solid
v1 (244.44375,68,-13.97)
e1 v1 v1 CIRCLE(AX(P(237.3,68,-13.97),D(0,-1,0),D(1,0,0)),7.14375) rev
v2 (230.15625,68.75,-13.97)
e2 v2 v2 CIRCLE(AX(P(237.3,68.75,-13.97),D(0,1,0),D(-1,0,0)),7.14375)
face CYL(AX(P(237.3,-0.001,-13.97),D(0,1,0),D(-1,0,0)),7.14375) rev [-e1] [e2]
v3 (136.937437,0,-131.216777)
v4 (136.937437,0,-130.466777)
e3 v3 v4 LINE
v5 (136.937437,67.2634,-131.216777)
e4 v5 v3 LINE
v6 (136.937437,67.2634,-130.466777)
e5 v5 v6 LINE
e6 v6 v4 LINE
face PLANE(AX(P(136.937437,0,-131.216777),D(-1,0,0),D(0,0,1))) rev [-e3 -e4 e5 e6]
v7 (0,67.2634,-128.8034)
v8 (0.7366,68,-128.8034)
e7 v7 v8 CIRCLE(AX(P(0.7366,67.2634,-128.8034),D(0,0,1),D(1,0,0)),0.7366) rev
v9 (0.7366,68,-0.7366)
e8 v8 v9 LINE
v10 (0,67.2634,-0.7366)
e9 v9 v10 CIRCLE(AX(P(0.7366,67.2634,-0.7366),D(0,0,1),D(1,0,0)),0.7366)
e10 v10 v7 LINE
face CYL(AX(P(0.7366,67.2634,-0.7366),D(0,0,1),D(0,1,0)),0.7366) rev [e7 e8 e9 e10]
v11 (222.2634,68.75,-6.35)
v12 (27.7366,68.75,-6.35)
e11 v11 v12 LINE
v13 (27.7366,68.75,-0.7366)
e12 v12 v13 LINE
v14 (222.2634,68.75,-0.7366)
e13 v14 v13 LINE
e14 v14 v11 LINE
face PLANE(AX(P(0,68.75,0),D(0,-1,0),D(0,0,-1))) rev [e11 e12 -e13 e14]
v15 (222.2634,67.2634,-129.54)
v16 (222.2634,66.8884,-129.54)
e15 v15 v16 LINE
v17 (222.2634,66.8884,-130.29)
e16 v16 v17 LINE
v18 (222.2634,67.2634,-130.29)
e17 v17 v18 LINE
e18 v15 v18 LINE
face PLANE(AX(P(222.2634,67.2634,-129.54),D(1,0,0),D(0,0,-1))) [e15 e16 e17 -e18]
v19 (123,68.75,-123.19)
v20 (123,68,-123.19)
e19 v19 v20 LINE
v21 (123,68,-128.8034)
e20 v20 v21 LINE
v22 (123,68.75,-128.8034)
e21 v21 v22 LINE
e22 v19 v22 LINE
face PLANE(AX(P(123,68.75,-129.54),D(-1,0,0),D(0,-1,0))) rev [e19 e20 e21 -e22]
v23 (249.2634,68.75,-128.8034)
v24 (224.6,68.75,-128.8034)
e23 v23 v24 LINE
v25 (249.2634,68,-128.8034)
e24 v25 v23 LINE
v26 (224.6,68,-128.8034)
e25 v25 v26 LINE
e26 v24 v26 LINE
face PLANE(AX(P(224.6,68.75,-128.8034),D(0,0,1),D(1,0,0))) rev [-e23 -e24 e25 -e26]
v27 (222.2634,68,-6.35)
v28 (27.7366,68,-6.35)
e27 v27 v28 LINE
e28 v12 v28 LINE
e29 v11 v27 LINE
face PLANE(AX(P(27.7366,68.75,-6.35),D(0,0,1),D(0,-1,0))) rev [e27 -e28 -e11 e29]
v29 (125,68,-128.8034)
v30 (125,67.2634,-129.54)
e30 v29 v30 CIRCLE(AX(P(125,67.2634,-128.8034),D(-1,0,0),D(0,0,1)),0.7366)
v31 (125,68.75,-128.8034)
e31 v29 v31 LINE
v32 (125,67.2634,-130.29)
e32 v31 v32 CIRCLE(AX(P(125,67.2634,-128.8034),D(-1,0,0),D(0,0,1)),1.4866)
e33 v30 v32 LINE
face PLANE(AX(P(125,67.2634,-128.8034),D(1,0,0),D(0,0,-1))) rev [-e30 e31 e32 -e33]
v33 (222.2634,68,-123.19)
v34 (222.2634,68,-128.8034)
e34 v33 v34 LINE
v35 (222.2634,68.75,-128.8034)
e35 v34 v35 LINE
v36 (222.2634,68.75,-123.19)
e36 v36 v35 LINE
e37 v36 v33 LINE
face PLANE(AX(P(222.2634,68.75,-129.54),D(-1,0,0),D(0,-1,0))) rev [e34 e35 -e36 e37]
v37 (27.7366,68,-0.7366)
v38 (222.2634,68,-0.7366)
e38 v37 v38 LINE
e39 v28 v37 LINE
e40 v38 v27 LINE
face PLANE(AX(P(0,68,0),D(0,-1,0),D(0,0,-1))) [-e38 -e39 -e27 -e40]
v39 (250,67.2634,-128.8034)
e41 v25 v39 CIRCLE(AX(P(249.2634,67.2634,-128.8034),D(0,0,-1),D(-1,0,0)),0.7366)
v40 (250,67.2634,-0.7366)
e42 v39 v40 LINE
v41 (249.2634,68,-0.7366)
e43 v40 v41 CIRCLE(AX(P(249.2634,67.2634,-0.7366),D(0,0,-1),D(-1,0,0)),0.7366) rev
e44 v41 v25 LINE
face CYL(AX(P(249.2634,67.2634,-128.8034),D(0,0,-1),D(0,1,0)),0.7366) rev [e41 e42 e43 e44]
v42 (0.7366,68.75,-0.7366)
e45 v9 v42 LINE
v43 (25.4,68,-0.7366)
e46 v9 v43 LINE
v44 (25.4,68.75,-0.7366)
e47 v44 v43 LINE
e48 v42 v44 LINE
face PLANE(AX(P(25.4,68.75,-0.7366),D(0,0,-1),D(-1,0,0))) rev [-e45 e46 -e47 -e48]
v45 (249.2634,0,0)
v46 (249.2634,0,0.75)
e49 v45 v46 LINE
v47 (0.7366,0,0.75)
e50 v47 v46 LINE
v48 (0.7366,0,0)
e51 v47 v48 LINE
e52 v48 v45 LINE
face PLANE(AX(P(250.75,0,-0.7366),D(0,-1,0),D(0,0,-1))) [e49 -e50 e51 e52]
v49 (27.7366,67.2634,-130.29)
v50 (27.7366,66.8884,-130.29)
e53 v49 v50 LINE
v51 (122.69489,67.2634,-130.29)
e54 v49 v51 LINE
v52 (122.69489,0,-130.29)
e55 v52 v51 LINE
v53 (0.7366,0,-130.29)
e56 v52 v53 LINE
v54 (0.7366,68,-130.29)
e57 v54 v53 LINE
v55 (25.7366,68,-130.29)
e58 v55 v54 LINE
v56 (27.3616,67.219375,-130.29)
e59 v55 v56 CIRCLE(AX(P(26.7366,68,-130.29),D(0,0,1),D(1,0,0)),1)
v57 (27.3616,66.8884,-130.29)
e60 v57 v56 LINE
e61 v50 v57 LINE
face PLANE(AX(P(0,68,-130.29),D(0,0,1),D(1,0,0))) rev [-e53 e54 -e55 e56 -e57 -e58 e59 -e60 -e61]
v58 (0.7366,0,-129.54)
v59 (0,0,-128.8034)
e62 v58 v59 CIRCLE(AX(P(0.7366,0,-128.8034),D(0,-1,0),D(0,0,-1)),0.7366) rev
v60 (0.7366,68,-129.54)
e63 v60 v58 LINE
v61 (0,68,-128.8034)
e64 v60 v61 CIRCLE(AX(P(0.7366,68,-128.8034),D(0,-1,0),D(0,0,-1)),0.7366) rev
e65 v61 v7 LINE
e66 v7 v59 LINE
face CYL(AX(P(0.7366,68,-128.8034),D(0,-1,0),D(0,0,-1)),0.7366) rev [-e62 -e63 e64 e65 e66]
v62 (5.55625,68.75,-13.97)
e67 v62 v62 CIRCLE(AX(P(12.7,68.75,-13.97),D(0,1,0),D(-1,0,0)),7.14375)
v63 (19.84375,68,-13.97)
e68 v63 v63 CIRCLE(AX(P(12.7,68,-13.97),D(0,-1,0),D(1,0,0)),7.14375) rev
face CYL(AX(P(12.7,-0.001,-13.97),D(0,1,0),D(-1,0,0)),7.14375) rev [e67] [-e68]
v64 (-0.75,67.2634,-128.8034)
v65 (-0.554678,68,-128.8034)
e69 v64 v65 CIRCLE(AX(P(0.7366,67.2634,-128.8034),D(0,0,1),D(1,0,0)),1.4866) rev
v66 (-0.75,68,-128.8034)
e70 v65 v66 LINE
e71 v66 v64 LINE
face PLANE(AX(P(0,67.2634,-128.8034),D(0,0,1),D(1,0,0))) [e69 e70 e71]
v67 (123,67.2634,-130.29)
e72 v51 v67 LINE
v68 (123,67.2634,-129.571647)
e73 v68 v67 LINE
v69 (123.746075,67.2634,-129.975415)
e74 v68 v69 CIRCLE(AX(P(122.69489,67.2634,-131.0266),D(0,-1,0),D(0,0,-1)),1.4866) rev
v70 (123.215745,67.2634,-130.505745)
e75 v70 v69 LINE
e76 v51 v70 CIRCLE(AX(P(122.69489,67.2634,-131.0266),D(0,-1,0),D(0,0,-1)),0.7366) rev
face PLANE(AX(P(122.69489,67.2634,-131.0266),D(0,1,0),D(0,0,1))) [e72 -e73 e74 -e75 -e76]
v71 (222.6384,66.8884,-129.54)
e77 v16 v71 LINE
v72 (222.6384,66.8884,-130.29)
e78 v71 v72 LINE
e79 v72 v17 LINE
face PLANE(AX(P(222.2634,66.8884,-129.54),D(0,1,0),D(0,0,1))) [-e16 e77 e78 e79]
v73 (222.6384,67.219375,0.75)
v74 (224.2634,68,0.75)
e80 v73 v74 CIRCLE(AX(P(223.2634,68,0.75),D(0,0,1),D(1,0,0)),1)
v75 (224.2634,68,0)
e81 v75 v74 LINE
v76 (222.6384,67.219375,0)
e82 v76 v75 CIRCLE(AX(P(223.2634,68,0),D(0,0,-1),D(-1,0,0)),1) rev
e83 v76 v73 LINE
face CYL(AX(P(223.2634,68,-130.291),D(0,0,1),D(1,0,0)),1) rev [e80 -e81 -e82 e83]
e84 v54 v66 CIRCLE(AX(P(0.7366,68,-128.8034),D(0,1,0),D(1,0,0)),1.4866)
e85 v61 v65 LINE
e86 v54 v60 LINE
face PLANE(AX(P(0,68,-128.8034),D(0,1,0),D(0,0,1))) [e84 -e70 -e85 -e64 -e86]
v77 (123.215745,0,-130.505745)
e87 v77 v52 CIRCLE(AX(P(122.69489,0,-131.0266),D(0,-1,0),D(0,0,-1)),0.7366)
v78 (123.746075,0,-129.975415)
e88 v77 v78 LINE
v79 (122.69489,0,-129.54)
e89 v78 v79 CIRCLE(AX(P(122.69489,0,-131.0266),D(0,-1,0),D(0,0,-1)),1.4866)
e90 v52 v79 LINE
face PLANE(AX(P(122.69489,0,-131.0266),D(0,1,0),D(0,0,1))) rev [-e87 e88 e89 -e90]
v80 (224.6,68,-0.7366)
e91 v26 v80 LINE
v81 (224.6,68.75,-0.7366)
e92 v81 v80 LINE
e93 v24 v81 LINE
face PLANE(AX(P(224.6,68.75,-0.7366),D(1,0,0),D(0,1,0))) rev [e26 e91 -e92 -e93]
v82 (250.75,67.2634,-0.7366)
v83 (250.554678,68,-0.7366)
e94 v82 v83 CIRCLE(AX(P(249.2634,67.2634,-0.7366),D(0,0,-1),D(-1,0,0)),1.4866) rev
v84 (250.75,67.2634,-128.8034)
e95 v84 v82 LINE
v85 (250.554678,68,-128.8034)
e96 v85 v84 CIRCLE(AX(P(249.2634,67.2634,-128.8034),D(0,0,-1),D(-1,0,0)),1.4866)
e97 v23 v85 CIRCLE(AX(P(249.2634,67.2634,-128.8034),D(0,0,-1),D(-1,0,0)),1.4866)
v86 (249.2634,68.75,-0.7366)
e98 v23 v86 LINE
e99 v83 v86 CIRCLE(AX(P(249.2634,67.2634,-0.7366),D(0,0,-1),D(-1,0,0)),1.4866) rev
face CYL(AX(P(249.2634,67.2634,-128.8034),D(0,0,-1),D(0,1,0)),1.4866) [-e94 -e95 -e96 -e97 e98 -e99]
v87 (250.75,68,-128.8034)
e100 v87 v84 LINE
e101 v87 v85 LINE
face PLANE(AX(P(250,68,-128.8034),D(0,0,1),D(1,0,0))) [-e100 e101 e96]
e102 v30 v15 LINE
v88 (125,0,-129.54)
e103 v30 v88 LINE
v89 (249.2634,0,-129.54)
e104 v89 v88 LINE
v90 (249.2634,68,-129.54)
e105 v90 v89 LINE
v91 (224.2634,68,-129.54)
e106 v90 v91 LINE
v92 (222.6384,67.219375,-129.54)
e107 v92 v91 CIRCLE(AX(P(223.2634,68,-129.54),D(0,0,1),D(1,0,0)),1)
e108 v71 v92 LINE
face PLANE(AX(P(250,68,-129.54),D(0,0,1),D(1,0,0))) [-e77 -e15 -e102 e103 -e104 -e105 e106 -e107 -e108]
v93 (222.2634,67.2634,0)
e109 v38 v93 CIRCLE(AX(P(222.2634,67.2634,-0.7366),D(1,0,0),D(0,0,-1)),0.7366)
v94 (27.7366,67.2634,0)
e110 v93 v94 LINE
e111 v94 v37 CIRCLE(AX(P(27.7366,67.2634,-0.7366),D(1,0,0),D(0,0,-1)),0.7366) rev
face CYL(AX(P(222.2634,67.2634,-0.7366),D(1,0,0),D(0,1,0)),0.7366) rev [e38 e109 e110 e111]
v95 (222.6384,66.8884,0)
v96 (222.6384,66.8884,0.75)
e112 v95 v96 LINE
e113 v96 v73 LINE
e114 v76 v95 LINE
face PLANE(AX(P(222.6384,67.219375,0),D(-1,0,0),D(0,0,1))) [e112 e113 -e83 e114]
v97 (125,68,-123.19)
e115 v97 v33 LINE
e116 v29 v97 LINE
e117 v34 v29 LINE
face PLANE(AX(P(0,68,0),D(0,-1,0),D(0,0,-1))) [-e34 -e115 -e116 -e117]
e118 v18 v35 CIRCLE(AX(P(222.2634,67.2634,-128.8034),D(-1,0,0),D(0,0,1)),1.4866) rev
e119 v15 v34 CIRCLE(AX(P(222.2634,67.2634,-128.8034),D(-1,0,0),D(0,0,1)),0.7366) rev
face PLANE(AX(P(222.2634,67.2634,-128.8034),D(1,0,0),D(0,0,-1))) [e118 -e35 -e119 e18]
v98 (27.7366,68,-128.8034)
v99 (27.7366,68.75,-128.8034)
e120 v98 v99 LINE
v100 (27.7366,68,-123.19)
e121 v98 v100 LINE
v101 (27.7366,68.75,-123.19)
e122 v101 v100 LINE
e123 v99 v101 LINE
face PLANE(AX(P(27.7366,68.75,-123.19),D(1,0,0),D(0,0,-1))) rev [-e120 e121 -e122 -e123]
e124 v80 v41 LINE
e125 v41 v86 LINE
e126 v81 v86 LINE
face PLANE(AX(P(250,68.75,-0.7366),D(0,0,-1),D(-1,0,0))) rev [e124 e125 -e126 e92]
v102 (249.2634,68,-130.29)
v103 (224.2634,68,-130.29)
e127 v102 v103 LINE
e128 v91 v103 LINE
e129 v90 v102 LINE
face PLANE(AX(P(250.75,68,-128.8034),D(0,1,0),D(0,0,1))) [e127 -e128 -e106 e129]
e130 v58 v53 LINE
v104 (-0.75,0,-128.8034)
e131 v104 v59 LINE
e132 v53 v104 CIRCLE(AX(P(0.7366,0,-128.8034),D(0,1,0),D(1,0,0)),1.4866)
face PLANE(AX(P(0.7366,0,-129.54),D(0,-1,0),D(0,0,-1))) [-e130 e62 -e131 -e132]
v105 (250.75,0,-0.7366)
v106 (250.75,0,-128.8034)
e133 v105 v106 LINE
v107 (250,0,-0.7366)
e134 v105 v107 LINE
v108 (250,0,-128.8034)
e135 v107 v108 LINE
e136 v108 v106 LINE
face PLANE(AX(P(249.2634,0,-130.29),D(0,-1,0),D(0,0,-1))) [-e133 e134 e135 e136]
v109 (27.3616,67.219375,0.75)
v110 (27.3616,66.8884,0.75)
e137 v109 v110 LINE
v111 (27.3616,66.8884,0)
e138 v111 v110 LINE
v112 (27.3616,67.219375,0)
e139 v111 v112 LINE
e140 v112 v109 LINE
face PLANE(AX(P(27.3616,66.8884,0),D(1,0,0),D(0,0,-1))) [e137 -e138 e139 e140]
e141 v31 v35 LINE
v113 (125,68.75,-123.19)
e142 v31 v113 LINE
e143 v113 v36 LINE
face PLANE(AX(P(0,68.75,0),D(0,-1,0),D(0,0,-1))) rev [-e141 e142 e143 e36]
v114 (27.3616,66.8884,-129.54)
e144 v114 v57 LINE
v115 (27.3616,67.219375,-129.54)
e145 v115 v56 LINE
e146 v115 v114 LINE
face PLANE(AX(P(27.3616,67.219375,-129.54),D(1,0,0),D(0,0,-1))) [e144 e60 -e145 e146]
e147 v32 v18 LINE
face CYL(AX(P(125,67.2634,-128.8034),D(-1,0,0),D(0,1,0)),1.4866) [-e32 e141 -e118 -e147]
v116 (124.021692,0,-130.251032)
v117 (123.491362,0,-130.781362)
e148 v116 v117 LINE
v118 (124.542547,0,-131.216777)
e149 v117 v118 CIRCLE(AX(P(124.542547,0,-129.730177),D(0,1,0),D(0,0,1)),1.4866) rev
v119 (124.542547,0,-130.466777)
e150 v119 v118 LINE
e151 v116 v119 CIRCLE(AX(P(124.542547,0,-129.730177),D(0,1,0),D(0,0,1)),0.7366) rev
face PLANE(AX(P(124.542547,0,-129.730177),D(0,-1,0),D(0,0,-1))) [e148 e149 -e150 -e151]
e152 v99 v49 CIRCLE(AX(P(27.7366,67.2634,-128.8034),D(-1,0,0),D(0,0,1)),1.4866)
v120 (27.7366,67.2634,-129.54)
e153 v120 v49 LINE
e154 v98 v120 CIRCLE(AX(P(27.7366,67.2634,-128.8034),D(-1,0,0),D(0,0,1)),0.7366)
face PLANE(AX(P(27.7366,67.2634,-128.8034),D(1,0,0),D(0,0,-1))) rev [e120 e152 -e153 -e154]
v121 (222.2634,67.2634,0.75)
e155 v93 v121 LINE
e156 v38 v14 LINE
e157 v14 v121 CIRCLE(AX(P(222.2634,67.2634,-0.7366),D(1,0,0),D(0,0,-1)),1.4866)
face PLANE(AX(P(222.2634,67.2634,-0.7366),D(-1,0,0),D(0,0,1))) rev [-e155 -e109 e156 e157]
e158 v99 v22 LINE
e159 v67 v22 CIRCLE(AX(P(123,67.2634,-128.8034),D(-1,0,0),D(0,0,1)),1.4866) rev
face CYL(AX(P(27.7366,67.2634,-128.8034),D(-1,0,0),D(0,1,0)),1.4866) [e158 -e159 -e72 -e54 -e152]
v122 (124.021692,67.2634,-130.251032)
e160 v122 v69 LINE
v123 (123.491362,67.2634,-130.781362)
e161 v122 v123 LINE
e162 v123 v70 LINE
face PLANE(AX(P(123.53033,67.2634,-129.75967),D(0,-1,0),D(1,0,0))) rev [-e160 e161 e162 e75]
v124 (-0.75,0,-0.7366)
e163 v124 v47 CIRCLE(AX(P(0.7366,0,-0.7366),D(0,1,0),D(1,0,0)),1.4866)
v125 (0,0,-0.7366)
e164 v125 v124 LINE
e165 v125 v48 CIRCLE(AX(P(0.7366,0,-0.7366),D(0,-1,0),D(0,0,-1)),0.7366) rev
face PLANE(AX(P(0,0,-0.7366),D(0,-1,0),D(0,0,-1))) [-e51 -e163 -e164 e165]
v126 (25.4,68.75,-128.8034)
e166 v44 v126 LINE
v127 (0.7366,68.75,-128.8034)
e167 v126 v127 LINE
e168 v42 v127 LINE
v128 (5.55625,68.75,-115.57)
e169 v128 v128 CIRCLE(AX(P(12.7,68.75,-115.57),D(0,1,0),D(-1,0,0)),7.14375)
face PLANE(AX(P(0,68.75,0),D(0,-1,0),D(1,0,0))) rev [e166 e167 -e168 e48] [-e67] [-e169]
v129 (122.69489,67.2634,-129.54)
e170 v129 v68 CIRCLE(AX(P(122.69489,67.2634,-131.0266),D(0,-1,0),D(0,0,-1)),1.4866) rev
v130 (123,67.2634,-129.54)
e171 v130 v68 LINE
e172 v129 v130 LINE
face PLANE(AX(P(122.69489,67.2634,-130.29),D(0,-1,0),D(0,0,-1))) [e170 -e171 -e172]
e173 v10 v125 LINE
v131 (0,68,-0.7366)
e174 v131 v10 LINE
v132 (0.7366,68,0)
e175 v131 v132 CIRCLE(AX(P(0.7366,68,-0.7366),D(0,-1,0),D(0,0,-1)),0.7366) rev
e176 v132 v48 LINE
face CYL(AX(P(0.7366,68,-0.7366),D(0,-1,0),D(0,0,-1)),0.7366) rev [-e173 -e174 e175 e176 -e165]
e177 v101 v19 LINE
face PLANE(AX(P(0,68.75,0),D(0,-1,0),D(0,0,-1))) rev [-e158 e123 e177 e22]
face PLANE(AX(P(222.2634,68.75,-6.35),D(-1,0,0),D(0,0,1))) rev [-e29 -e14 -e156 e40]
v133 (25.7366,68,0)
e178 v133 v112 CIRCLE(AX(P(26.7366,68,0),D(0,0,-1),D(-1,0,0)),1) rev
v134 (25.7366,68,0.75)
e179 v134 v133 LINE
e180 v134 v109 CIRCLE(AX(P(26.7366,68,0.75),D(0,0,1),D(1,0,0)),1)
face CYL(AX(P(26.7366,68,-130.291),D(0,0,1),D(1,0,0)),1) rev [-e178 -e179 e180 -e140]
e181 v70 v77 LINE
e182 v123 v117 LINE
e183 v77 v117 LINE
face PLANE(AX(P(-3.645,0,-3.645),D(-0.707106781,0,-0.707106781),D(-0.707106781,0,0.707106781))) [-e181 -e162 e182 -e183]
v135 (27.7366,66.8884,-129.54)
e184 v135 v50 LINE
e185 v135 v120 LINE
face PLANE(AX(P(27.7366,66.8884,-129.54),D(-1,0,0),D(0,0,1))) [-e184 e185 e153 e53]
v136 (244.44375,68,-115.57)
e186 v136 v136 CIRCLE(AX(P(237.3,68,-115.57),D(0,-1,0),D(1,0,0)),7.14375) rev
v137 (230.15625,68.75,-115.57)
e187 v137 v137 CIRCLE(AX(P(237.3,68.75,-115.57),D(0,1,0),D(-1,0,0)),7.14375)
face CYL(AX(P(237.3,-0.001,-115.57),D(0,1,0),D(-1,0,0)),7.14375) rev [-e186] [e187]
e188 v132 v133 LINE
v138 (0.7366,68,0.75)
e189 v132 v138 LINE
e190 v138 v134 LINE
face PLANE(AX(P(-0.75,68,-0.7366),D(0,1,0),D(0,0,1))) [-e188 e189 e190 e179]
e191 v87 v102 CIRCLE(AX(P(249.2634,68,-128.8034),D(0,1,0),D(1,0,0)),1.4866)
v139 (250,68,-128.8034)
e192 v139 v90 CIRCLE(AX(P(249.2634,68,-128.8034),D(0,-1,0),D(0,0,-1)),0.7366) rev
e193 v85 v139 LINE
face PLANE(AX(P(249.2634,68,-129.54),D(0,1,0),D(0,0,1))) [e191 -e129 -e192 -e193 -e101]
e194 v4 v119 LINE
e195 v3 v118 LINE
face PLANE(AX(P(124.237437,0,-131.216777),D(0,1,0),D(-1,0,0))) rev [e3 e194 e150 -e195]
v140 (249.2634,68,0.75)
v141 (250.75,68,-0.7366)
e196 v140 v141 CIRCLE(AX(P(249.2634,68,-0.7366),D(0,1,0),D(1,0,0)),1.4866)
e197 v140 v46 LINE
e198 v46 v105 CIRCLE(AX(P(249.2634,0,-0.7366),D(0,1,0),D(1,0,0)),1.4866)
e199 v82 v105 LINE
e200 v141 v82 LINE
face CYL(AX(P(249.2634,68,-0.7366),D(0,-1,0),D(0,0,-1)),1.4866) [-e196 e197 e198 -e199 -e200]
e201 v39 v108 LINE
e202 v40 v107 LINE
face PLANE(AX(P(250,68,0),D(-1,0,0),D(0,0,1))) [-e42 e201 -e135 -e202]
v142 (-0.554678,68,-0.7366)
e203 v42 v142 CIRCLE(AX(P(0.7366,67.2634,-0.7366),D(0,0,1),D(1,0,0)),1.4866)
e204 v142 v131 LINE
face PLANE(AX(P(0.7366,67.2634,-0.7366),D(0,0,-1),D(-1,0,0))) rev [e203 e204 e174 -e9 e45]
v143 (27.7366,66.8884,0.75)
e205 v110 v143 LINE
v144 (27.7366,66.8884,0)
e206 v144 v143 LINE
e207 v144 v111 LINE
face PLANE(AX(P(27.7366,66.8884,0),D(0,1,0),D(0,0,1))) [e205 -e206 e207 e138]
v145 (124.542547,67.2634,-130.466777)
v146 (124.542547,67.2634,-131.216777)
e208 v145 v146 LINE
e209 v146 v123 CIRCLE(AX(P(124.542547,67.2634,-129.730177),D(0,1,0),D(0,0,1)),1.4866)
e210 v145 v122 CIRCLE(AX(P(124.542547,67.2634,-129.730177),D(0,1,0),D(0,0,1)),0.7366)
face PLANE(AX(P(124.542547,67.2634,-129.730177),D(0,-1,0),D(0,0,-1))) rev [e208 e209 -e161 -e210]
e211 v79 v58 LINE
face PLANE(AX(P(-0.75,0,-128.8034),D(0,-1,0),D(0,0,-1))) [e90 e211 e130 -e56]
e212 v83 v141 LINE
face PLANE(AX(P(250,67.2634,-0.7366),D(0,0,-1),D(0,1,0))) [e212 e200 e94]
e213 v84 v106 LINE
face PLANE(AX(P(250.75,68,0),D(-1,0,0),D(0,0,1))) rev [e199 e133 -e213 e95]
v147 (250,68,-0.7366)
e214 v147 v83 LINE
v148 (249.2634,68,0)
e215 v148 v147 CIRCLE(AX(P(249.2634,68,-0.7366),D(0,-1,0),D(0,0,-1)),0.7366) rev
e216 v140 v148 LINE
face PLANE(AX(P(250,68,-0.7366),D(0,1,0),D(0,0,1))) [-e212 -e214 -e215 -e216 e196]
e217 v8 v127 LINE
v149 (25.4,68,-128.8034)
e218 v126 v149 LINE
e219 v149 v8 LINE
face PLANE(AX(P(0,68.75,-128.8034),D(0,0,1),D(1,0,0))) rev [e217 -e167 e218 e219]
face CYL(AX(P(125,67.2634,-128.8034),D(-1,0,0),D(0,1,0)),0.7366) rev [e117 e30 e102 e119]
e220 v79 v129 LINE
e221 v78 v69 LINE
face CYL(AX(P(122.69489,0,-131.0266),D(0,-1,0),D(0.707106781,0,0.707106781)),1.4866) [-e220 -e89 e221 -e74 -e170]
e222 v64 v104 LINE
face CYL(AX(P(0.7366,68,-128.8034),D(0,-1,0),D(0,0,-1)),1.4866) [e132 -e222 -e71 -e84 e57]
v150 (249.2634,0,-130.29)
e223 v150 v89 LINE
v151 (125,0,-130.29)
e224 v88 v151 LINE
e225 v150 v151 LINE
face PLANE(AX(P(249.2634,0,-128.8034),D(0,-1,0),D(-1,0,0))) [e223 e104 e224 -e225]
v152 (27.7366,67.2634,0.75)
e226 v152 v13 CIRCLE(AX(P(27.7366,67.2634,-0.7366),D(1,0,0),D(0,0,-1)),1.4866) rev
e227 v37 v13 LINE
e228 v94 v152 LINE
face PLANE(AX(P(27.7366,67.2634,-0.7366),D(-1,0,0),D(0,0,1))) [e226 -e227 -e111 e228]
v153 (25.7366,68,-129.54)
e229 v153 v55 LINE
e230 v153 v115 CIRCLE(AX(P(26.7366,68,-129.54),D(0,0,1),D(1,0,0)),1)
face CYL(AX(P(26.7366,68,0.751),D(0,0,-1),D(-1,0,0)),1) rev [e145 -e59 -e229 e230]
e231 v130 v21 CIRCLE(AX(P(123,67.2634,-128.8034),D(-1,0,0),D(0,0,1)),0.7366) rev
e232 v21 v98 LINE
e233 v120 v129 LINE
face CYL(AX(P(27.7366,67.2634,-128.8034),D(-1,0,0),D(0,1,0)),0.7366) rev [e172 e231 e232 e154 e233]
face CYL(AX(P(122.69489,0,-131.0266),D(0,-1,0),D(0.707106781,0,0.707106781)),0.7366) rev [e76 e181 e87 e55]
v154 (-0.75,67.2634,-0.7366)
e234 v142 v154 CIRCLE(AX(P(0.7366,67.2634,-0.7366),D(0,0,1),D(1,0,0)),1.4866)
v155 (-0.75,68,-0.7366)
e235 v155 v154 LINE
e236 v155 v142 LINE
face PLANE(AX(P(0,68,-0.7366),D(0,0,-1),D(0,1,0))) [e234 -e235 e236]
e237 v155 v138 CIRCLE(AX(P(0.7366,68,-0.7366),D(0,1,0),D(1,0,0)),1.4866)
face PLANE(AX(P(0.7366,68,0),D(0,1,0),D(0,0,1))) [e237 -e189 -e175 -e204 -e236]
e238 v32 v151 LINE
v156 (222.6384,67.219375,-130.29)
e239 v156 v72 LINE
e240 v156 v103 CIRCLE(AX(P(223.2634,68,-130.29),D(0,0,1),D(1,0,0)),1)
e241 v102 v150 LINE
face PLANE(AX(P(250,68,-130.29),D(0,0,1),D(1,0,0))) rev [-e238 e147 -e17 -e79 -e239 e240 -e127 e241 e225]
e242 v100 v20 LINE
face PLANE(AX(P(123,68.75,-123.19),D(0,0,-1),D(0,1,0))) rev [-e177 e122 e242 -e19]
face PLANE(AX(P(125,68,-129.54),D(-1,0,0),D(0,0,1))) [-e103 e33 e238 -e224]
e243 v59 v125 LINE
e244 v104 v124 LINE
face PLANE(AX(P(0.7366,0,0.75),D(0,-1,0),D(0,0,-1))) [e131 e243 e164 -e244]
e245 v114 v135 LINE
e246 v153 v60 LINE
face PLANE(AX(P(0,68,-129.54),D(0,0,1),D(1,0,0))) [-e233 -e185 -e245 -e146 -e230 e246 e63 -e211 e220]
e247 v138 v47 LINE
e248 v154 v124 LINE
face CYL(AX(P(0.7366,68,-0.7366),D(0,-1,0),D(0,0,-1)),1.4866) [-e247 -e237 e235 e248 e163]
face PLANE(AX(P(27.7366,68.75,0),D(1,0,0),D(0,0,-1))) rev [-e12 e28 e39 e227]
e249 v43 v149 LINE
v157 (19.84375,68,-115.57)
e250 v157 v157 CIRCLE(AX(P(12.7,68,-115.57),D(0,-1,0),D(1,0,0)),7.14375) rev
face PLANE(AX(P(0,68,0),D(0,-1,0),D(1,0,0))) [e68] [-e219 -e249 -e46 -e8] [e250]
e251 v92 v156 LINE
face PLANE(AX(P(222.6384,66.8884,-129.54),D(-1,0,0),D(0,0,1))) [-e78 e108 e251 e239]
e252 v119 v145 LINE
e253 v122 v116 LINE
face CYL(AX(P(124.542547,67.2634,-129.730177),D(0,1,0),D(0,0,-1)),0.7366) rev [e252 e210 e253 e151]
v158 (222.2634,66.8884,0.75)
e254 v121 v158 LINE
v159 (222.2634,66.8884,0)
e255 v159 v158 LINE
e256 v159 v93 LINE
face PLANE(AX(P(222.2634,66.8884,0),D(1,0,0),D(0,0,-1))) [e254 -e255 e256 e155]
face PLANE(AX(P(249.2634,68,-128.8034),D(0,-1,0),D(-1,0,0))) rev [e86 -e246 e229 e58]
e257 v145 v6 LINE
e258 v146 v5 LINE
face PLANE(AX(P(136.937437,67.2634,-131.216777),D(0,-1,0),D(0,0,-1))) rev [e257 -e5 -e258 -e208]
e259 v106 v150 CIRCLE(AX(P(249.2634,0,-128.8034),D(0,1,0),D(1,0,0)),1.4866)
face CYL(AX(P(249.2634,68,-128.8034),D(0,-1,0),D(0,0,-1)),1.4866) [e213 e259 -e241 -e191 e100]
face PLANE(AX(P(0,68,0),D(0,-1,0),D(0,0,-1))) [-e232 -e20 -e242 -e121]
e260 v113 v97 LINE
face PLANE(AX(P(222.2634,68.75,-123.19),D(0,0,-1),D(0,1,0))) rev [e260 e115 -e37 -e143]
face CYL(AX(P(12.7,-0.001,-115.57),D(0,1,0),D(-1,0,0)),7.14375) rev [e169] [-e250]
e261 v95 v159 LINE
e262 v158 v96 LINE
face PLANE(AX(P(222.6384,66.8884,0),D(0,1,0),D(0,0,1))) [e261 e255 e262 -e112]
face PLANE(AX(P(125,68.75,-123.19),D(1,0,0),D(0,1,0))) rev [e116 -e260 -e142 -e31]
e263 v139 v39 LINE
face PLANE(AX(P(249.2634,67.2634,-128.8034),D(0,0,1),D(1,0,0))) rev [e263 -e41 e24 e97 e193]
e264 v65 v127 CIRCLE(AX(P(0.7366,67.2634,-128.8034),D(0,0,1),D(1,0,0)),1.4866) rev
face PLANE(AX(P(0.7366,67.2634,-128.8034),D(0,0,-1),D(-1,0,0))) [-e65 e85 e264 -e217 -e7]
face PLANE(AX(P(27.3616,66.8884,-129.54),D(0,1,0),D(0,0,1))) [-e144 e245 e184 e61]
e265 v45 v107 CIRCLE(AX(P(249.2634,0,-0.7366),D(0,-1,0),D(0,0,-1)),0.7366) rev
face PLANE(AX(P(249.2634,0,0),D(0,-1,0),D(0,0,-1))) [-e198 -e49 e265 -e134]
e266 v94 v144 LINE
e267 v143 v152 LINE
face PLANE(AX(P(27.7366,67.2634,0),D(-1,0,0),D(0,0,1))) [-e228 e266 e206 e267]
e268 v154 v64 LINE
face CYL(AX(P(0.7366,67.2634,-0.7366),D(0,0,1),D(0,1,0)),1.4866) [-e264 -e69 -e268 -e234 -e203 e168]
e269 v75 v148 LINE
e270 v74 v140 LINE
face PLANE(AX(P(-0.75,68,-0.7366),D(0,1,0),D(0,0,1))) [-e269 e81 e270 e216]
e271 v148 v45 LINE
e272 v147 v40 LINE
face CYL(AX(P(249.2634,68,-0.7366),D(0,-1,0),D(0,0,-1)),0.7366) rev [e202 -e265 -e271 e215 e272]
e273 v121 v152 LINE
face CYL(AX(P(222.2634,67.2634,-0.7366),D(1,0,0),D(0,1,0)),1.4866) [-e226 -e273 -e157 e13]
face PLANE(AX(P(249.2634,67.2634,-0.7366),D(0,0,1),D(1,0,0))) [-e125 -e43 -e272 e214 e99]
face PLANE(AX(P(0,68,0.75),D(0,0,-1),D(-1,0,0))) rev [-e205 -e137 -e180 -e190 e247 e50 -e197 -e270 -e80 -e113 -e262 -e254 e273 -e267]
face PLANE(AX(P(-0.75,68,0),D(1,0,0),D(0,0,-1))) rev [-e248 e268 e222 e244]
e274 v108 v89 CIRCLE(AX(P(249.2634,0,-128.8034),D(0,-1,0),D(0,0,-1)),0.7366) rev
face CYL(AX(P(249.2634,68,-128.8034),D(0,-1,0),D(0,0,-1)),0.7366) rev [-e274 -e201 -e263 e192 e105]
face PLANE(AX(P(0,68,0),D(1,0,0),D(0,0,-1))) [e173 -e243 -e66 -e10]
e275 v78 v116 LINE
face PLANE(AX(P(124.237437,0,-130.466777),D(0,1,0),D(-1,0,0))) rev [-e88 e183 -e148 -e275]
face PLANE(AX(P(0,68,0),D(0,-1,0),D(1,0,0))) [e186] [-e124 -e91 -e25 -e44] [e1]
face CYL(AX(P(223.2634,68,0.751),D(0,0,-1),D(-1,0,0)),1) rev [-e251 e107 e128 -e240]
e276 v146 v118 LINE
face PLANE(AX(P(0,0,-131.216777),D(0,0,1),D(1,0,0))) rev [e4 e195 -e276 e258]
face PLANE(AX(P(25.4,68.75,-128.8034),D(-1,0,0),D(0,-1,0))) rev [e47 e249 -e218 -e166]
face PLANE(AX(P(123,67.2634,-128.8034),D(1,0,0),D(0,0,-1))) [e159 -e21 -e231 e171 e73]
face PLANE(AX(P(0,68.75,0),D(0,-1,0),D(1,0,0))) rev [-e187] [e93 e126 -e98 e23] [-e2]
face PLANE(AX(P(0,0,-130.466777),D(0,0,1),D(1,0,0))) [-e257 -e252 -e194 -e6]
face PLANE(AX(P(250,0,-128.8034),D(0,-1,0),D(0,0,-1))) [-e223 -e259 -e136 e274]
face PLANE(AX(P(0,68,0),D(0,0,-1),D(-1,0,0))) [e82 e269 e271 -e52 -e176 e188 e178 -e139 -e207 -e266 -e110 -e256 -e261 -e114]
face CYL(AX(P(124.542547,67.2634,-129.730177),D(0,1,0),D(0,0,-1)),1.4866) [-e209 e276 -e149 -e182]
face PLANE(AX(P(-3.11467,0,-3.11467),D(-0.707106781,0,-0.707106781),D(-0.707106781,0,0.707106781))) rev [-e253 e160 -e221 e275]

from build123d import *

# Parameters (mm, degrees)
BASE_FLANGE2_DEPTH              = 68
EDGE_FLANGE1_STRIP_W            = 4.4732
EDGE_FLANGE1_STRIP_H            = 0.75
EDGE_FLANGE1_STRIP_CUT_DEPTH    = 128.0668
EDGE_FLANGE1_STRIP_2_W          = 4.4732
EDGE_FLANGE1_STRIP_2_H          = 0.75
EDGE_FLANGE1_STRIP_CUT_2_DEPTH  = 128.0668
EDGE_FLANGE1_DEPTH              = 128.0668
EDGE_FLANGE1_BEND_DEPTH         = 128.0668
CUT_EXTRUDE2_REACH              = 293.159
SKETCH19_R                      = 1
EDGE_FLANGE2_STRIP_W            = 4.4732
EDGE_FLANGE2_STRIP_H            = 0.75
EDGE_FLANGE2_STRIP_CUT_DEPTH    = 194.5268
EDGE_FLANGE2_RELIEF_W           = 4.8482
EDGE_FLANGE2_RELIEF_H           = 0.375
EDGE_FLANGE2_RELIEF_CUT_DEPTH   = 0.75
EDGE_FLANGE2_STRIP_2_W          = 4.4732
EDGE_FLANGE2_STRIP_2_H          = 0.75
EDGE_FLANGE2_STRIP_CUT_2_DEPTH  = 95.2634
EDGE_FLANGE2_RELIEF_2_W         = 4.8482
EDGE_FLANGE2_RELIEF_2_H         = 0.375
EDGE_FLANGE2_RELIEF_CUT_2_DEPTH = 0.75
EDGE_FLANGE2_STRIP_3_W          = 4.4732
EDGE_FLANGE2_STRIP_3_H          = 0.75
EDGE_FLANGE2_STRIP_CUT_3_DEPTH  = 97.2634
EDGE_FLANGE2_RELIEF_3_W         = 4.8482
EDGE_FLANGE2_RELIEF_3_H         = 0.375
EDGE_FLANGE2_RELIEF_CUT_3_DEPTH = 0.75
EDGE_FLANGE2_DEPTH              = 194.5268
EDGE_FLANGE2_BEND_DEPTH         = 95.2634
EDGE_FLANGE2_BEND_2_DEPTH       = 97.2634
EDGE_FLANGE3_DEPTH              = 67.2634
EDGE_FLANGE3_2_DEPTH            = 67.2634
EDGE_FLANGE4_STRIP_CUT_DEPTH    = 67.2634
EDGE_FLANGE4_DEPTH              = 67.2634
CUT_EXTRUDE3_REACH              = 293.239
SKETCH36_R                      = 7.14375


# Read off the part's stored shape, not the designer's step: Edge-Flange3
# Sheet-metal steps are written as plain solids
with BuildPart() as part:
    # Sketch10 → Base-Flange2 (new body)
    with BuildSketch(Plane(origin=(0, 0, 0), x_dir=(1, 0, 0), z_dir=(0, 1, 0))):
        with BuildLine():
            Line((123, 129.54), (0.7366, 129.54))
            ThreePointArc((0.7366, 129.54), (0.215745145, 129.324254855), (0, 128.8034))
            Line((0, 128.8034), (0, 0.7366))
            ThreePointArc((0, 0.7366), (0.215745145, 0.215745145), (0.7366, 0))
            Line((0.7366, 0), (249.2634, 0))
            ThreePointArc((249.2634, 0), (249.784254855, 0.215745145), (250, 0.7366))
            Line((250, 0.7366), (250, 128.8034))
            ThreePointArc((250, 128.8034), (249.784254855, 129.324254855), (249.2634, 129.54))
            Line((249.2634, 129.54), (125, 129.54))
            Line((125, 129.54), (125, 130.29))
            Line((125, 130.29), (249.2634, 130.29))
            ThreePointArc((249.2634, 130.29), (250.314584941, 129.854584941), (250.75, 128.8034))
            Line((250.75, 128.8034), (250.75, 0.7366))
            ThreePointArc((250.75, 0.7366), (250.314584941, -0.314584941), (249.2634, -0.75))
            Line((249.2634, -0.75), (0.7366, -0.75))
            ThreePointArc((0.7366, -0.75), (-0.314584941, -0.314584941), (-0.75, 0.7366))
            Line((-0.75, 0.7366), (-0.75, 128.8034))
            ThreePointArc((-0.75, 128.8034), (-0.314584941, 129.854584941), (0.7366, 130.29))
            Line((0.7366, 130.29), (123, 130.29))
            Line((123, 130.29), (123, 129.54))
        make_face()
    extrude(amount=BASE_FLANGE2_DEPTH)

    # Edge-Flange1 strip (across the edge) → Edge-Flange1 strip cut (cut)
    with BuildSketch(Plane(origin=(0, 68, -128.8034), x_dir=(0, -1, 0), z_dir=(0, 0, 1))):
        with Locations((-1.5, -0.375)):
            Rectangle(EDGE_FLANGE1_STRIP_W, EDGE_FLANGE1_STRIP_H)
    extrude(amount=EDGE_FLANGE1_STRIP_CUT_DEPTH, mode=Mode.SUBTRACT)

    # Edge-Flange1 strip 2 (across the edge) → Edge-Flange1 strip cut 2 (cut)
    with BuildSketch(Plane(origin=(250, 68, -0.7366), x_dir=(0, -1, 0), z_dir=(0, 0, -1))):
        with Locations((-1.5, -0.375)):
            Rectangle(EDGE_FLANGE1_STRIP_2_W, EDGE_FLANGE1_STRIP_2_H)
    extrude(amount=EDGE_FLANGE1_STRIP_CUT_2_DEPTH, mode=Mode.SUBTRACT)

    # Edge-Flange1 section (across the edge) → Edge-Flange1 (add)
    with BuildSketch(Plane(origin=(0, 68, -128.8034), x_dir=(0, -1, 0), z_dir=(0, 0, 1))):
        with BuildLine():
            Line((-0.75, 0.7366), (-0.75, 25.4))
            Line((-0.75, 25.4), (0, 25.4))
            Line((0, 25.4), (0, 0.7366))
            ThreePointArc((0, 0.7366), (0.215745145, 0.215745145), (0.7366, 0))
            Line((0.7366, 0), (0.7366, -0.75))
            ThreePointArc((0.7366, -0.75), (-0.314584941, -0.314584941), (-0.75, 0.7366))
        make_face()
    extrude(amount=EDGE_FLANGE1_DEPTH)

    # Edge-Flange1 section 2 (across the edge) → Edge-Flange1 bend (add)
    with BuildSketch(Plane(origin=(250, 68, -0.7366), x_dir=(0, -1, 0), z_dir=(0, 0, -1))):
        with BuildLine():
            Line((-0.75, 0.7366), (-0.75, 25.4))
            Line((-0.75, 25.4), (0, 25.4))
            Line((0, 25.4), (0, 0.7366))
            ThreePointArc((0, 0.7366), (0.215745145, 0.215745145), (0.7366, 0))
            Line((0.7366, 0), (0.7366, -0.75))
            ThreePointArc((0.7366, -0.75), (-0.314584941, -0.314584941), (-0.75, 0.7366))
        make_face()
    extrude(amount=EDGE_FLANGE1_BEND_DEPTH)

    # Sketch19 → Cut-Extrude2 (cut, up to next)
    with BuildSketch(Plane.XY.offset(0.75), mode=Mode.PRIVATE) as cut_extrude2_sk1:
        with Locations((26.7366, 68)):
            Circle(SKETCH19_R)
    cut_extrude2_tool1 = extrude(cut_extrude2_sk1.sketch, amount=-CUT_EXTRUDE2_REACH, mode=Mode.PRIVATE) & part.part
    # Sketch19 → Cut-Extrude2 (cut, up to next)
    with BuildSketch(Plane.XY.offset(0.75), mode=Mode.PRIVATE) as cut_extrude2_sk2:
        with Locations((223.2634, 68)):
            Circle(SKETCH19_R)
    cut_extrude2_tool2 = extrude(cut_extrude2_sk2.sketch, amount=-CUT_EXTRUDE2_REACH, mode=Mode.PRIVATE) & part.part
    cut_extrude2_1 = cut_extrude2_tool1.solids().sort_by_distance((26.7366, 68, 0.75))[0]
    add(cut_extrude2_1, mode=Mode.SUBTRACT)
    cut_extrude2_2 = cut_extrude2_tool2.solids().sort_by_distance((223.2634, 68, 0.75))[0]
    add(cut_extrude2_2, mode=Mode.SUBTRACT)
    cut_extrude2 = cut_extrude2_1 + cut_extrude2_2  # Cut-Extrude2 as one shape, for the pattern or mirror that repeats it

    # Mirror1: Cut-Extrude2 across plane
    add(cut_extrude2.mirror(Plane.XY.offset(-64.77)), mode=Mode.SUBTRACT)

    # Edge-Flange2 strip (across the edge) → Edge-Flange2 strip cut (cut)
    with BuildSketch(Plane(origin=(27.7366, 68, 0), x_dir=(0, -1, 0), z_dir=(1, 0, 0))):
        with Locations((-1.5, -0.375)):
            Rectangle(EDGE_FLANGE2_STRIP_W, EDGE_FLANGE2_STRIP_H)
    extrude(amount=EDGE_FLANGE2_STRIP_CUT_DEPTH, mode=Mode.SUBTRACT)

    # Edge-Flange2 relief (on the sheet) → Edge-Flange2 relief cut (cut)
    with BuildSketch(Plane(origin=(27.7366, 67.2634, 0), x_dir=(0, -1, 0), z_dir=(0, 0, -1))):
        with Locations((-2.0491, 0.1875)):
            Rectangle(EDGE_FLANGE2_RELIEF_W, EDGE_FLANGE2_RELIEF_H)
        with Locations((-2.0491, -194.7143)):
            Rectangle(EDGE_FLANGE2_RELIEF_W, EDGE_FLANGE2_RELIEF_H)
    extrude(amount=-EDGE_FLANGE2_RELIEF_CUT_DEPTH, mode=Mode.SUBTRACT)

    # Edge-Flange2 strip 2 (across the edge) → Edge-Flange2 strip cut 2 (cut)
    with BuildSketch(Plane(origin=(123, 68, -129.54), x_dir=(0, -1, 0), z_dir=(-1, 0, 0))):
        with Locations((-1.5, -0.375)):
            Rectangle(EDGE_FLANGE2_STRIP_2_W, EDGE_FLANGE2_STRIP_2_H)
    extrude(amount=EDGE_FLANGE2_STRIP_CUT_2_DEPTH, mode=Mode.SUBTRACT)

    # Edge-Flange2 relief 2 (on the sheet) → Edge-Flange2 relief cut 2 (cut)
    with BuildSketch(Plane(origin=(123, 67.2634, -129.54), x_dir=(0, -1, 0), z_dir=(0, 0, 1))):
        with Locations((-2.0491, -95.4509)):
            Rectangle(EDGE_FLANGE2_RELIEF_2_W, EDGE_FLANGE2_RELIEF_2_H)
    extrude(amount=-EDGE_FLANGE2_RELIEF_CUT_2_DEPTH, mode=Mode.SUBTRACT)

    # Edge-Flange2 strip 3 (across the edge) → Edge-Flange2 strip cut 3 (cut)
    with BuildSketch(Plane(origin=(222.2634, 68, -129.54), x_dir=(0, -1, 0), z_dir=(-1, 0, 0))):
        with Locations((-1.5, -0.375)):
            Rectangle(EDGE_FLANGE2_STRIP_3_W, EDGE_FLANGE2_STRIP_3_H)
    extrude(amount=EDGE_FLANGE2_STRIP_CUT_3_DEPTH, mode=Mode.SUBTRACT)

    # Edge-Flange2 relief 3 (on the sheet) → Edge-Flange2 relief cut 3 (cut)
    with BuildSketch(Plane(origin=(222.2634, 67.2634, -129.54), x_dir=(0, -1, 0), z_dir=(0, 0, 1))):
        with Locations((-2.0491, 0.1875)):
            Rectangle(EDGE_FLANGE2_RELIEF_3_W, EDGE_FLANGE2_RELIEF_3_H)
    extrude(amount=-EDGE_FLANGE2_RELIEF_CUT_3_DEPTH, mode=Mode.SUBTRACT)

    # Edge-Flange2 section (across the edge) → Edge-Flange2 (add)
    with BuildSketch(Plane(origin=(27.7366, 68, 0), x_dir=(0, -1, 0), z_dir=(1, 0, 0))):
        with BuildLine():
            Line((-0.75, 0.7366), (-0.75, 6.35))
            Line((-0.75, 6.35), (0, 6.35))
            Line((0, 6.35), (0, 0.7366))
            ThreePointArc((0, 0.7366), (0.215745145, 0.215745145), (0.7366, 0))
            Line((0.7366, 0), (0.7366, -0.75))
            ThreePointArc((0.7366, -0.75), (-0.314584941, -0.314584941), (-0.75, 0.7366))
        make_face()
    extrude(amount=EDGE_FLANGE2_DEPTH)

    # Edge-Flange2 section 2 (across the edge) → Edge-Flange2 bend (add)
    with BuildSketch(Plane(origin=(123, 68, -129.54), x_dir=(0, -1, 0), z_dir=(-1, 0, 0))):
        with BuildLine():
            Line((-0.75, 0.7366), (-0.75, 6.35))
            Line((-0.75, 6.35), (0, 6.35))
            Line((0, 6.35), (0, 0.7366))
            ThreePointArc((0, 0.7366), (0.215745145, 0.215745145), (0.7366, 0))
            Line((0.7366, 0), (0.7366, -0.75))
            ThreePointArc((0.7366, -0.75), (-0.314584941, -0.314584941), (-0.75, 0.7366))
        make_face()
    extrude(amount=EDGE_FLANGE2_BEND_DEPTH)

    # Edge-Flange2 section 3 (across the edge) → Edge-Flange2 bend 2 (add)
    with BuildSketch(Plane(origin=(222.2634, 68, -129.54), x_dir=(0, -1, 0), z_dir=(-1, 0, 0))):
        with BuildLine():
            Line((-0.75, 0.7366), (-0.75, 6.35))
            Line((-0.75, 6.35), (0, 6.35))
            Line((0, 6.35), (0, 0.7366))
            ThreePointArc((0, 0.7366), (0.215745145, 0.215745145), (0.7366, 0))
            Line((0.7366, 0), (0.7366, -0.75))
            ThreePointArc((0.7366, -0.75), (-0.314584941, -0.314584941), (-0.75, 0.7366))
        make_face()
    extrude(amount=EDGE_FLANGE2_BEND_2_DEPTH)

    # Edge-Flange3 outline → Edge-Flange3 (cut)
    with BuildSketch(Plane(origin=(0, 0, 0), x_dir=(1, 0, 0), z_dir=(0, 1, 0))):
        with BuildLine():
            Line((123, 129.54), (123, 129.571647209))
            ThreePointArc((123, 129.571647209), (122.848263594, 129.547932969), (122.69489029, 129.54))
            Line((122.69489029, 129.54), (123, 129.54))
        make_face()
    extrude(amount=EDGE_FLANGE3_DEPTH, mode=Mode.SUBTRACT)

    # Edge-Flange3 2 outline → Edge-Flange3 2 (add)
    with BuildSketch(Plane(origin=(0, 0, 0), x_dir=(1, 0, 0), z_dir=(0, 1, 0))):
        with BuildLine():
            ThreePointArc((123, 129.571647209), (123.402450121, 129.719183216), (123.746075231, 129.975415059))
            Line((123.746075231, 129.975415059), (124.237436867, 130.466776695))
            Line((124.237436867, 130.466776695), (123.707106781, 130.997106781))
            Line((123.707106781, 130.997106781), (123.215745145, 130.505745145))
            ThreePointArc((123.215745145, 130.505745145), (122.976774906, 130.346070336), (122.69489029, 130.29))
            Line((122.69489029, 130.29), (123, 130.29))
            Line((123, 130.29), (123, 129.571647209))
        make_face()
    extrude(amount=EDGE_FLANGE3_2_DEPTH)

    # Edge-Flange4 strip (across the edge) → Edge-Flange4 strip cut (cut)
    with BuildSketch(Plane(origin=(124.237436867, 0, -130.466776695), x_dir=(0, 0, 1), z_dir=(0, 1, 0))):
        Polygon((-3.477614995, 2.416954823), (-0.314584941, -0.746075231), (0.215745145, -0.215745145), (-2.947284909, 2.947284909), align=None)
    extrude(amount=EDGE_FLANGE4_STRIP_CUT_DEPTH, mode=Mode.SUBTRACT)

    # Edge-Flange4 section (across the edge) → Edge-Flange4 (add)
    with BuildSketch(Plane(origin=(124.237436867, 0, -130.466776695), x_dir=(0, 0, 1), z_dir=(0, 1, 0))):
        with BuildLine():
            Line((-0.75, 0.30510971), (-0.75, 12.7))
            Line((-0.75, 12.7), (0, 12.7))
            Line((0, 12.7), (0, 0.30510971))
            ThreePointArc((0, 0.30510971), (0.056070336, 0.023225094), (0.215745145, -0.215745145))
            Line((0.215745145, -0.215745145), (-0.314584941, -0.746075231))
            ThreePointArc((-0.314584941, -0.746075231), (-0.636839313, -0.263787481), (-0.75, 0.30510971))
        make_face()
    extrude(amount=EDGE_FLANGE4_DEPTH)

    # Sketch36 → Cut-Extrude3 (cut, up to next)
    with BuildSketch(Plane(origin=(0, 68.75, 0), x_dir=(1, 0, 0), z_dir=(0, 1, 0)), mode=Mode.PRIVATE) as cut_extrude3_sk1:
        with Locations(Location((12.7, 115.57, 0), (0, 0, 180))):
            Circle(SKETCH36_R)
    cut_extrude3_tool1 = extrude(cut_extrude3_sk1.sketch, amount=-CUT_EXTRUDE3_REACH, mode=Mode.PRIVATE) & part.part
    # Sketch36 → Cut-Extrude3 (cut, up to next)
    with BuildSketch(Plane(origin=(0, 68.75, 0), x_dir=(1, 0, 0), z_dir=(0, 1, 0)), mode=Mode.PRIVATE) as cut_extrude3_sk2:
        with Locations(Location((237.3, 115.57, 0), (0, 0, 180))):
            Circle(SKETCH36_R)
    cut_extrude3_tool2 = extrude(cut_extrude3_sk2.sketch, amount=-CUT_EXTRUDE3_REACH, mode=Mode.PRIVATE) & part.part
    # Sketch36 → Cut-Extrude3 (cut, up to next)
    with BuildSketch(Plane(origin=(0, 68.75, 0), x_dir=(1, 0, 0), z_dir=(0, 1, 0)), mode=Mode.PRIVATE) as cut_extrude3_sk3:
        with Locations(Location((237.3, 13.97, 0), (0, 0, 180))):
            Circle(SKETCH36_R)
    cut_extrude3_tool3 = extrude(cut_extrude3_sk3.sketch, amount=-CUT_EXTRUDE3_REACH, mode=Mode.PRIVATE) & part.part
    # Sketch36 → Cut-Extrude3 (cut, up to next)
    with BuildSketch(Plane(origin=(0, 68.75, 0), x_dir=(1, 0, 0), z_dir=(0, 1, 0)), mode=Mode.PRIVATE) as cut_extrude3_sk4:
        with Locations(Location((12.7, 13.97, 0), (0, 0, 180))):
            Circle(SKETCH36_R)
    cut_extrude3_tool4 = extrude(cut_extrude3_sk4.sketch, amount=-CUT_EXTRUDE3_REACH, mode=Mode.PRIVATE) & part.part
    add(cut_extrude3_tool1.solids().sort_by_distance((12.7, 68.75, -115.57))[0], mode=Mode.SUBTRACT)
    add(cut_extrude3_tool2.solids().sort_by_distance((237.3, 68.75, -115.57))[0], mode=Mode.SUBTRACT)
    add(cut_extrude3_tool3.solids().sort_by_distance((237.3, 68.75, -13.97))[0], mode=Mode.SUBTRACT)
    add(cut_extrude3_tool4.solids().sort_by_distance((12.7, 68.75, -13.97))[0], mode=Mode.SUBTRACT)


solid = part.part
